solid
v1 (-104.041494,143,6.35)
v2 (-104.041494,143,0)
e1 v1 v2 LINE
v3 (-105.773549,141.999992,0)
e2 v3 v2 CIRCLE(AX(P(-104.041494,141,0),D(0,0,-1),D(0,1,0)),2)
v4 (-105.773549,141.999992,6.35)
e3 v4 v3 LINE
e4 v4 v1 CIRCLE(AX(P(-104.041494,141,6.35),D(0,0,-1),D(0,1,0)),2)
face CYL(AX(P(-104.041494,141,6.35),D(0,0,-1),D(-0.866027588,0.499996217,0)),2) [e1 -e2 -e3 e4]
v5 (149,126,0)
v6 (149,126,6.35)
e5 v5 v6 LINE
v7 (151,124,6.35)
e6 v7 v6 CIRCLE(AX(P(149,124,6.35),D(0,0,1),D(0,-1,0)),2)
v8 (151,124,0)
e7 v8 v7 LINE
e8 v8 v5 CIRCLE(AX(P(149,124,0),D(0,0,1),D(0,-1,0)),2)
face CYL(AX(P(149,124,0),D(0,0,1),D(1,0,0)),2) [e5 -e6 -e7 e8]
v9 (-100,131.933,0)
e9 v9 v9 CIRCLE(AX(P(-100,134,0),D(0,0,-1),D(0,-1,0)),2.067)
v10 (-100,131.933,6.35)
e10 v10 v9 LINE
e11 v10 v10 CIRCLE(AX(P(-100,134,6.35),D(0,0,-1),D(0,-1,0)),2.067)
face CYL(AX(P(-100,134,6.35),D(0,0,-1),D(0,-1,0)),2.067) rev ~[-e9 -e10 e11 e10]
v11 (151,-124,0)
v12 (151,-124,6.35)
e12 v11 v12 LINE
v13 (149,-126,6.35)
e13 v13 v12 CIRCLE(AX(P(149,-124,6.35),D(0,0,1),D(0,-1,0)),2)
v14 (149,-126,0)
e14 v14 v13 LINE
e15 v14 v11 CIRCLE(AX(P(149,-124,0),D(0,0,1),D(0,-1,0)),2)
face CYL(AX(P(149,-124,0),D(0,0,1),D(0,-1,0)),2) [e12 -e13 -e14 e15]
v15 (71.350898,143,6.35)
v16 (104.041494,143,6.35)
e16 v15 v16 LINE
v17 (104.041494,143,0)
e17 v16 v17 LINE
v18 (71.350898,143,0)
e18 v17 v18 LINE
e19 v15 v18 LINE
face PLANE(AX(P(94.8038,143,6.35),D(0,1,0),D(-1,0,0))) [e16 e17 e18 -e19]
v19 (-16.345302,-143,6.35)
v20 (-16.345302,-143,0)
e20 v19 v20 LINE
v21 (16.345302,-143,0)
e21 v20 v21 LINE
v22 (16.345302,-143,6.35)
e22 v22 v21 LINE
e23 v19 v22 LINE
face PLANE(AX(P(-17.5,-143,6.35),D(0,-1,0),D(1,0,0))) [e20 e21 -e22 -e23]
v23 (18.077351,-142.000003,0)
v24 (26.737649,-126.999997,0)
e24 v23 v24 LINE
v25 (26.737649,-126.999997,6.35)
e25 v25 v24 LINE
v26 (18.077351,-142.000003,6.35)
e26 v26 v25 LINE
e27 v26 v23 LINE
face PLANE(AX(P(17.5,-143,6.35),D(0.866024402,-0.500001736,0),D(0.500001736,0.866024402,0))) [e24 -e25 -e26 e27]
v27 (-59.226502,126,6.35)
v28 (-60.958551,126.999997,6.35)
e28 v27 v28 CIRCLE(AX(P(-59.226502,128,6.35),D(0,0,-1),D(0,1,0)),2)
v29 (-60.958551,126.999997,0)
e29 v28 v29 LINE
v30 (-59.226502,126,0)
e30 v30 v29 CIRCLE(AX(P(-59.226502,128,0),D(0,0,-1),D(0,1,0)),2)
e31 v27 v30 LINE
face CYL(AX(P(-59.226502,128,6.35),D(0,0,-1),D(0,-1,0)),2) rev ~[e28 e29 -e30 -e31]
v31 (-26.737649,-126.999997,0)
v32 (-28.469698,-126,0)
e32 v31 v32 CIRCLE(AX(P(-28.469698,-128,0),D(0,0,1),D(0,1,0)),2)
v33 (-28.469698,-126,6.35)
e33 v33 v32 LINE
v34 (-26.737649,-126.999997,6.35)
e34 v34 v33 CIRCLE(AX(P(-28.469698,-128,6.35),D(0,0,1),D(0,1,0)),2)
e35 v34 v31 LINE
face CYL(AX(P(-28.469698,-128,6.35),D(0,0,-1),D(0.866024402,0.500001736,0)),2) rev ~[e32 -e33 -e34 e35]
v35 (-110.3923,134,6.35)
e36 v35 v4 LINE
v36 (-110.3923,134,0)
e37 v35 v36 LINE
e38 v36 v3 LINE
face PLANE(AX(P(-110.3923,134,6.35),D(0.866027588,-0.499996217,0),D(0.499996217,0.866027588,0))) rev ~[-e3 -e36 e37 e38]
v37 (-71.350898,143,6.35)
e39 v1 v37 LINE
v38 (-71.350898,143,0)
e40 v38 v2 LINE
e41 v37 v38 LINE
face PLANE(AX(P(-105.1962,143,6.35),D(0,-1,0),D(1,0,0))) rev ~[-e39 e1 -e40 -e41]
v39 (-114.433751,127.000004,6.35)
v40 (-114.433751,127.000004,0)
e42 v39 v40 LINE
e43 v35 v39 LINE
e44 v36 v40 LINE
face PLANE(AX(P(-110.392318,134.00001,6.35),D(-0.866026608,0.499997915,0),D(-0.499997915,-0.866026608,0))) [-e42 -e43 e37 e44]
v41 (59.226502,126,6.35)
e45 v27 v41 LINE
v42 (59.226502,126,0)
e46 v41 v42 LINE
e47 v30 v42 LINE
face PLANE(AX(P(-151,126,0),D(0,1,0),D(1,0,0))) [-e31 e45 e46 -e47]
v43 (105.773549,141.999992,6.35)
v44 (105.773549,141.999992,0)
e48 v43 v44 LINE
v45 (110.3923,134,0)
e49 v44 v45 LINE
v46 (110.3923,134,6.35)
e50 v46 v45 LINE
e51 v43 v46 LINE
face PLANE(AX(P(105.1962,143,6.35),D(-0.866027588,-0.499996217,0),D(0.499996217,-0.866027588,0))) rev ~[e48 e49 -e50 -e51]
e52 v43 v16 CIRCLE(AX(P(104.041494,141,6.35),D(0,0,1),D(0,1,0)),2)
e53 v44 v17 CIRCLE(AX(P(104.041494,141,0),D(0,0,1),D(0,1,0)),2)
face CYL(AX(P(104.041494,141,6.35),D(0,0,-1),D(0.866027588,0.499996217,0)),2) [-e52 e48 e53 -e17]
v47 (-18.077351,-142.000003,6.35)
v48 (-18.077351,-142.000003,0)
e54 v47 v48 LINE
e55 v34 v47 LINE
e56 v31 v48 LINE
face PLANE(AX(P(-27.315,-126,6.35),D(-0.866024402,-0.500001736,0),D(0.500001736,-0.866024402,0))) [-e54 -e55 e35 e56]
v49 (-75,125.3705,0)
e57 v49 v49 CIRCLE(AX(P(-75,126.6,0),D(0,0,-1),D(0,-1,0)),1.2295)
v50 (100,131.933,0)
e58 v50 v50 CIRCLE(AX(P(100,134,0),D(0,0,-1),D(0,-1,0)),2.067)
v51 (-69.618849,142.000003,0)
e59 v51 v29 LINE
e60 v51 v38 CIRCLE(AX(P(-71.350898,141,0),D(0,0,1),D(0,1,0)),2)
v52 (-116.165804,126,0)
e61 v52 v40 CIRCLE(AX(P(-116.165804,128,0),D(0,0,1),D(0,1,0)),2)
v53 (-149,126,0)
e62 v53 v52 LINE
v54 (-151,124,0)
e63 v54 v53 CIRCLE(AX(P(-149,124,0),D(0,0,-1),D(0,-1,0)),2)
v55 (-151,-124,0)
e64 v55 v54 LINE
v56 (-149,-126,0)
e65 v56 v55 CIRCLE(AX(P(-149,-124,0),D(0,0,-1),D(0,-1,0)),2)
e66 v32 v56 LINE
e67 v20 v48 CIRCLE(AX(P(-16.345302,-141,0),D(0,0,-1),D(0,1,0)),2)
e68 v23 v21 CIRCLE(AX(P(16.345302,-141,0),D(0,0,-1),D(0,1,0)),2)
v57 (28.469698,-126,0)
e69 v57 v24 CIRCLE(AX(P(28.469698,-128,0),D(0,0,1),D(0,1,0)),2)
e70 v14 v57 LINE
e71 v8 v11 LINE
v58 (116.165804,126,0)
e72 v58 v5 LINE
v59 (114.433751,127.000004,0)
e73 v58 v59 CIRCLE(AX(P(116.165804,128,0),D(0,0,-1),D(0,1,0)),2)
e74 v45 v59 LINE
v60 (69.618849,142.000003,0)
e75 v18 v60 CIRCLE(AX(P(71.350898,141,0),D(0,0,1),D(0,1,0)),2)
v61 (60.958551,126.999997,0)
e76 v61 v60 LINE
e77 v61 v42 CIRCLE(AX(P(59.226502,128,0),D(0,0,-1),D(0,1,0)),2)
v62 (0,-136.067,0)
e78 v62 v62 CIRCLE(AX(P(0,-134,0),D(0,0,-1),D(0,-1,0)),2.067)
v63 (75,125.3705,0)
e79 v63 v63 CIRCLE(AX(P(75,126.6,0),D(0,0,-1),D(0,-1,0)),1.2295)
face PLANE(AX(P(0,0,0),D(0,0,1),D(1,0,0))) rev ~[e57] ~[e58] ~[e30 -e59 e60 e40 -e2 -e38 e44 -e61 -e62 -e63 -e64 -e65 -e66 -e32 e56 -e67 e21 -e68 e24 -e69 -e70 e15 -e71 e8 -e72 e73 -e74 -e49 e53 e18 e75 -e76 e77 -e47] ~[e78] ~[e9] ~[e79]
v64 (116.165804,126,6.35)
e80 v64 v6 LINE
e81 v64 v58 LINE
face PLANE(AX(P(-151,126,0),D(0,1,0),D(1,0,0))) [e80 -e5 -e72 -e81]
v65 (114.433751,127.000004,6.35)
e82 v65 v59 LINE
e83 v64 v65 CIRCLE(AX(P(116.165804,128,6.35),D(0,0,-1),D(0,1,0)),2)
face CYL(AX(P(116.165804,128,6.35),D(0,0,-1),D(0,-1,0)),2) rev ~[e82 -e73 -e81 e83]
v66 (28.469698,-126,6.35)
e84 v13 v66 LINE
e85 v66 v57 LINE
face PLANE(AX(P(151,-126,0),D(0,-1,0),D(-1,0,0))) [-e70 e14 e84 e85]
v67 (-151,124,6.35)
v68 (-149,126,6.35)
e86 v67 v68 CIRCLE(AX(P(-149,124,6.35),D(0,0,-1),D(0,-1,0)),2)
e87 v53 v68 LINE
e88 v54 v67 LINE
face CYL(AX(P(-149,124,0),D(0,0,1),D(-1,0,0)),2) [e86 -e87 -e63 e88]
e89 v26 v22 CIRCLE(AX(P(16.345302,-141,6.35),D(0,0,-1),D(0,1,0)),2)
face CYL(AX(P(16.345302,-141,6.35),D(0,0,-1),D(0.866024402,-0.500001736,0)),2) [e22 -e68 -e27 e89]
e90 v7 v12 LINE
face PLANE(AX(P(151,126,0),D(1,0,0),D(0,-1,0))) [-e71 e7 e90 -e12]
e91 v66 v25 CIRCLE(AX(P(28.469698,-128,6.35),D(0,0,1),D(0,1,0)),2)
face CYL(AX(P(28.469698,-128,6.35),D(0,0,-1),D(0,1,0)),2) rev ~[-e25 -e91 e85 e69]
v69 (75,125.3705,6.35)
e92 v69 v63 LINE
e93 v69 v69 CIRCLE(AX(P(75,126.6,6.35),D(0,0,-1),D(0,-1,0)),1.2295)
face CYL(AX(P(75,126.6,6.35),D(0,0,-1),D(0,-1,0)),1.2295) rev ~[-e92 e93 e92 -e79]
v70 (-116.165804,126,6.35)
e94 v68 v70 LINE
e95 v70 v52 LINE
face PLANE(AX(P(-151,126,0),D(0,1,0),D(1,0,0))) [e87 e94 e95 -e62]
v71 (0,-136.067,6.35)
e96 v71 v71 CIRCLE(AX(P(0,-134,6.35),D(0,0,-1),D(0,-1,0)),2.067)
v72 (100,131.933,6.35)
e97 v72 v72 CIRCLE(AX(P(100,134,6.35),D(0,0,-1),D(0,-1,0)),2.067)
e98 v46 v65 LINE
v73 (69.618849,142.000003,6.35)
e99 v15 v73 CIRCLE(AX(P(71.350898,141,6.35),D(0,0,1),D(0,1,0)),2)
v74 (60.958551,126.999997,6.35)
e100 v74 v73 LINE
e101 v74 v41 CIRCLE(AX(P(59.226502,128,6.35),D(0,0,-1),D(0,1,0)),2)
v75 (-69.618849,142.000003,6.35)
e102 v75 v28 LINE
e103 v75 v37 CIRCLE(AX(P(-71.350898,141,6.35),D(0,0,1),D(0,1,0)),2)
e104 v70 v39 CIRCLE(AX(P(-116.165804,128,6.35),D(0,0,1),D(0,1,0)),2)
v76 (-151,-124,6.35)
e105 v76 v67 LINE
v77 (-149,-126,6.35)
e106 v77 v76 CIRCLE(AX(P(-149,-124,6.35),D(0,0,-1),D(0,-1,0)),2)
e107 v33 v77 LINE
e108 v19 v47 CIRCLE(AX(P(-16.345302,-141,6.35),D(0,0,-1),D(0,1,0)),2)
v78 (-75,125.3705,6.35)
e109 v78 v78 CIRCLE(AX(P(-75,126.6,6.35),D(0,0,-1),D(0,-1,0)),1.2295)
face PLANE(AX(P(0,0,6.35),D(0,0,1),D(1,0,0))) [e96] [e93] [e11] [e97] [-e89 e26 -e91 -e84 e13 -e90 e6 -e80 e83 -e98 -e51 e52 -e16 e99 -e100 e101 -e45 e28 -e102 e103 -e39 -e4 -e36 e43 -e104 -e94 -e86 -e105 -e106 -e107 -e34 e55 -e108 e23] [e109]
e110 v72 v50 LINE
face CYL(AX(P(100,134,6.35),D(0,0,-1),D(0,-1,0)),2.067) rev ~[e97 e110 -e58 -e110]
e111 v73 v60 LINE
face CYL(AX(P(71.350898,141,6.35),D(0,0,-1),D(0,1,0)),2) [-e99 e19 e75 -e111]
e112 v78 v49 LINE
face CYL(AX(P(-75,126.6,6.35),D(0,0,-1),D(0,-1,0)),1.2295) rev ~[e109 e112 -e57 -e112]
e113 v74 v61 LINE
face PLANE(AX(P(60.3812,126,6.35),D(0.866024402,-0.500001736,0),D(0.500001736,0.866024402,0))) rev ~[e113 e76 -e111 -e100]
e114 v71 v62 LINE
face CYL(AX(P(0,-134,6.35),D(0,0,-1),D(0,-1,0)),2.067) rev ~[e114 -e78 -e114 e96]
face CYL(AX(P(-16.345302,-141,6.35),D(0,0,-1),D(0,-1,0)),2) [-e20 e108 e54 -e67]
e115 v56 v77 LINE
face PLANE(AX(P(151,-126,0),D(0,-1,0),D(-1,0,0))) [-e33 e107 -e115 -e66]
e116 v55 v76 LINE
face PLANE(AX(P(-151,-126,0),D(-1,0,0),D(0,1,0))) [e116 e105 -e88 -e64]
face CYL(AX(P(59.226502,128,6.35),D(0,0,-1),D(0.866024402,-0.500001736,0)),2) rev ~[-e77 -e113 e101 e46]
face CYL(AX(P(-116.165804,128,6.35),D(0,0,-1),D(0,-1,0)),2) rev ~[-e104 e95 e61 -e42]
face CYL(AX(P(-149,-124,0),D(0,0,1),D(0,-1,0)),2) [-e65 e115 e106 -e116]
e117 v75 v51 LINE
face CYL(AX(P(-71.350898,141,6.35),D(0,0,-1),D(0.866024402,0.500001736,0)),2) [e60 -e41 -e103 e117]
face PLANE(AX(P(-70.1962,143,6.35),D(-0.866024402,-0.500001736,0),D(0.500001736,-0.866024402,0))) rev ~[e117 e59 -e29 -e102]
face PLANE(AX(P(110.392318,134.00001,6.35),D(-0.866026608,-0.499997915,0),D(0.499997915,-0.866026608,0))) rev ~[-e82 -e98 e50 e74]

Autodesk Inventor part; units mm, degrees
ref_plane "YZ Plane" through (0, 0, 0) normal (1, 0, 0) x (0, 1, 0)
ref_plane "XZ Plane" through (0, 0, 0) normal (0, 1, 0) x (-1, 0, 0)
ref_plane "XY Plane" through (0, 0, 0) normal (0, 0, 1) x (1, 0, 0)
sketch "Sketch1" plane through (0, 0, 0) normal (0, 0, 1) x (1, 0, 0)
  line L0 (151, -126) -> (-151, -126)
  line L1 (-151, -126) -> (-151, 126)
  line L2 (-151, 126) -> (151, 126)
  line L3 (151, 126) -> (151, -126)
  line L4 (151, -126) -> (-151, 126) construction
  line L5 (-151, -126) -> (151, 126) construction
  point P0 (0, 0)
  dimension "d0" = 302
  dimension "d1" = 252
extrude "Extrusion1" add sketch "Sketch1" along normal blind 6.35
sketch "Sketch2" plane through (0, 0, 6.35) normal (0, 0, 1) x (1, 0, 0)
  line L0 (-110.3923, 134) -> (-105.1962, 143)
  line L1 (-105.1962, 143) -> (-94.8038, 143)
  line L2 (-94.8038, 143) -> (-89.6077, 134)
  line L3 (-89.6077, 134) -> (-94.8038, 125)
  line L4 (-94.8038, 125) -> (-105.1962, 125)
  line L5 (-105.1962, 125) -> (-110.3923, 134)
  line L6 (94.8038, 143) -> (105.1962, 143)
  line L7 (105.1962, 143) -> (110.3923, 134)
  line L8 (110.3923, 134) -> (105.1962, 125)
  line L9 (105.1962, 125) -> (94.8038, 125)
  line L10 (94.8038, 125) -> (89.6077, 134)
  line L11 (89.6077, 134) -> (94.8038, 143)
  line L12 (-100, 134) -> (100, 134) construction
  line L13 (151, 126) -> (-151, 126) projected
  line L14 (-105.1962, 143) -> (-115.0111, 126)
  line L15 (105.1962, 143) -> (115.0111, 126)
  line L16 (94.8038, 143) -> (-94.8038, 143)
  line L17 (-151, -126) -> (151, -126) projected
  line L18 (-27.315, -126) -> (-17.5, -143)
  line L19 (-17.5, -143) -> (17.5, -143)
  line L20 (17.5, -143) -> (27.315, -126)
  line L21 (-70.1962, 143) -> (-60.3812, 126)
  line L22 (60.3812, 126) -> (70.1962, 143)
  point P0 (0, 0)
  point P1 (0, 134)
  point P2 (0, -143)
  point P3 (0, -134)
  dimension "d4" = 18
  dimension "d5" = 200
  dimension "d6" = 8
  dimension "d7" = 17
  dimension "d8" = 17
  dimension "d9" = 35
  dimension "d10" = 8
  dimension "d32" = 35
  dimension "d33" = 35
extrude "Extrusion2" add sketch "Sketch2" against normal up to surface (6.35 mm away) contours L0 L1 L2 L3 L13 L5 | L5 L13 L14 | L16 L21 L13 L3 L2 | L16 L11 L10 L13 L22 | L6 L7 L8 L13 L10 L11 | L8 L15 L13 | L17 L20 L19 L18
hole "Hole1" at (0, -134, 6.35) at (-100, 134, 6.35) at (100, 134, 6.35) direction (0, 0, -1) diameter 4.134 end through all thread size "M5x0.8" class "6H" standard "ANSI Metric M Profile"
fillet "Fillet1" radius 2 16 edges at (17.5, -143, 3.175) (27.315, -126, 3.175) (151, -126, 3.175) (-151, 126, 3.175) (115.0111, 126, 3.175) (105.1962, 143, 3.175) (151, 126, 3.175) (-27.315, -126, 3.175) (-17.5, -143, 3.175) (-151, -126, 3.175) (-115.0111, 126, 3.175) (-105.1962, 143, 3.175) (-70.1962, 143, 3.175) (-60.3812, 126, 3.175) (60.3812, 126, 3.175) (70.1962, 143, 3.175)
sketch "Sketch3" plane through (0, 0, 6.35) normal (0, 0, 1) x (1, 0, 0)
  line L0 (150, -125) -> (-150, -125) construction
  line L1 (-150, -125) -> (-150, 125) construction
  line L2 (-150, 125) -> (150, 125) construction
  line L3 (150, 125) -> (150, -125) construction
  line L4 (150, -125) -> (-150, 125) construction
  line L5 (-150, -125) -> (150, 125) construction
  circle A0 centre (-75, 126.6) radius 1.6 construction
  line L6 (-75, 126.6) -> (75, 126.6) construction
  circle A1 centre (75, 126.6) radius 1.6 construction
  point P0 (0, 0)
  point P1 (0, 126.6)
  dimension "d21" = 300
  dimension "d22" = 250
  dimension "d23" = 3.2
  dimension "d24" = 150
hole "Hole2" at (-75, 126.6, 6.35) at (75, 126.6, 6.35) direction (0, 0, -1) diameter 2.459 end through all thread size "M3x0.5" class "6H" standard "ANSI Metric M Profile"
equation "\"d7\" = d8"
equation "\"d10\" = d6"
equation "\"d32\" = d9"
equation "\"d33\" = d32"
properties part number "Print Bed" material "Aluminum 6061"
